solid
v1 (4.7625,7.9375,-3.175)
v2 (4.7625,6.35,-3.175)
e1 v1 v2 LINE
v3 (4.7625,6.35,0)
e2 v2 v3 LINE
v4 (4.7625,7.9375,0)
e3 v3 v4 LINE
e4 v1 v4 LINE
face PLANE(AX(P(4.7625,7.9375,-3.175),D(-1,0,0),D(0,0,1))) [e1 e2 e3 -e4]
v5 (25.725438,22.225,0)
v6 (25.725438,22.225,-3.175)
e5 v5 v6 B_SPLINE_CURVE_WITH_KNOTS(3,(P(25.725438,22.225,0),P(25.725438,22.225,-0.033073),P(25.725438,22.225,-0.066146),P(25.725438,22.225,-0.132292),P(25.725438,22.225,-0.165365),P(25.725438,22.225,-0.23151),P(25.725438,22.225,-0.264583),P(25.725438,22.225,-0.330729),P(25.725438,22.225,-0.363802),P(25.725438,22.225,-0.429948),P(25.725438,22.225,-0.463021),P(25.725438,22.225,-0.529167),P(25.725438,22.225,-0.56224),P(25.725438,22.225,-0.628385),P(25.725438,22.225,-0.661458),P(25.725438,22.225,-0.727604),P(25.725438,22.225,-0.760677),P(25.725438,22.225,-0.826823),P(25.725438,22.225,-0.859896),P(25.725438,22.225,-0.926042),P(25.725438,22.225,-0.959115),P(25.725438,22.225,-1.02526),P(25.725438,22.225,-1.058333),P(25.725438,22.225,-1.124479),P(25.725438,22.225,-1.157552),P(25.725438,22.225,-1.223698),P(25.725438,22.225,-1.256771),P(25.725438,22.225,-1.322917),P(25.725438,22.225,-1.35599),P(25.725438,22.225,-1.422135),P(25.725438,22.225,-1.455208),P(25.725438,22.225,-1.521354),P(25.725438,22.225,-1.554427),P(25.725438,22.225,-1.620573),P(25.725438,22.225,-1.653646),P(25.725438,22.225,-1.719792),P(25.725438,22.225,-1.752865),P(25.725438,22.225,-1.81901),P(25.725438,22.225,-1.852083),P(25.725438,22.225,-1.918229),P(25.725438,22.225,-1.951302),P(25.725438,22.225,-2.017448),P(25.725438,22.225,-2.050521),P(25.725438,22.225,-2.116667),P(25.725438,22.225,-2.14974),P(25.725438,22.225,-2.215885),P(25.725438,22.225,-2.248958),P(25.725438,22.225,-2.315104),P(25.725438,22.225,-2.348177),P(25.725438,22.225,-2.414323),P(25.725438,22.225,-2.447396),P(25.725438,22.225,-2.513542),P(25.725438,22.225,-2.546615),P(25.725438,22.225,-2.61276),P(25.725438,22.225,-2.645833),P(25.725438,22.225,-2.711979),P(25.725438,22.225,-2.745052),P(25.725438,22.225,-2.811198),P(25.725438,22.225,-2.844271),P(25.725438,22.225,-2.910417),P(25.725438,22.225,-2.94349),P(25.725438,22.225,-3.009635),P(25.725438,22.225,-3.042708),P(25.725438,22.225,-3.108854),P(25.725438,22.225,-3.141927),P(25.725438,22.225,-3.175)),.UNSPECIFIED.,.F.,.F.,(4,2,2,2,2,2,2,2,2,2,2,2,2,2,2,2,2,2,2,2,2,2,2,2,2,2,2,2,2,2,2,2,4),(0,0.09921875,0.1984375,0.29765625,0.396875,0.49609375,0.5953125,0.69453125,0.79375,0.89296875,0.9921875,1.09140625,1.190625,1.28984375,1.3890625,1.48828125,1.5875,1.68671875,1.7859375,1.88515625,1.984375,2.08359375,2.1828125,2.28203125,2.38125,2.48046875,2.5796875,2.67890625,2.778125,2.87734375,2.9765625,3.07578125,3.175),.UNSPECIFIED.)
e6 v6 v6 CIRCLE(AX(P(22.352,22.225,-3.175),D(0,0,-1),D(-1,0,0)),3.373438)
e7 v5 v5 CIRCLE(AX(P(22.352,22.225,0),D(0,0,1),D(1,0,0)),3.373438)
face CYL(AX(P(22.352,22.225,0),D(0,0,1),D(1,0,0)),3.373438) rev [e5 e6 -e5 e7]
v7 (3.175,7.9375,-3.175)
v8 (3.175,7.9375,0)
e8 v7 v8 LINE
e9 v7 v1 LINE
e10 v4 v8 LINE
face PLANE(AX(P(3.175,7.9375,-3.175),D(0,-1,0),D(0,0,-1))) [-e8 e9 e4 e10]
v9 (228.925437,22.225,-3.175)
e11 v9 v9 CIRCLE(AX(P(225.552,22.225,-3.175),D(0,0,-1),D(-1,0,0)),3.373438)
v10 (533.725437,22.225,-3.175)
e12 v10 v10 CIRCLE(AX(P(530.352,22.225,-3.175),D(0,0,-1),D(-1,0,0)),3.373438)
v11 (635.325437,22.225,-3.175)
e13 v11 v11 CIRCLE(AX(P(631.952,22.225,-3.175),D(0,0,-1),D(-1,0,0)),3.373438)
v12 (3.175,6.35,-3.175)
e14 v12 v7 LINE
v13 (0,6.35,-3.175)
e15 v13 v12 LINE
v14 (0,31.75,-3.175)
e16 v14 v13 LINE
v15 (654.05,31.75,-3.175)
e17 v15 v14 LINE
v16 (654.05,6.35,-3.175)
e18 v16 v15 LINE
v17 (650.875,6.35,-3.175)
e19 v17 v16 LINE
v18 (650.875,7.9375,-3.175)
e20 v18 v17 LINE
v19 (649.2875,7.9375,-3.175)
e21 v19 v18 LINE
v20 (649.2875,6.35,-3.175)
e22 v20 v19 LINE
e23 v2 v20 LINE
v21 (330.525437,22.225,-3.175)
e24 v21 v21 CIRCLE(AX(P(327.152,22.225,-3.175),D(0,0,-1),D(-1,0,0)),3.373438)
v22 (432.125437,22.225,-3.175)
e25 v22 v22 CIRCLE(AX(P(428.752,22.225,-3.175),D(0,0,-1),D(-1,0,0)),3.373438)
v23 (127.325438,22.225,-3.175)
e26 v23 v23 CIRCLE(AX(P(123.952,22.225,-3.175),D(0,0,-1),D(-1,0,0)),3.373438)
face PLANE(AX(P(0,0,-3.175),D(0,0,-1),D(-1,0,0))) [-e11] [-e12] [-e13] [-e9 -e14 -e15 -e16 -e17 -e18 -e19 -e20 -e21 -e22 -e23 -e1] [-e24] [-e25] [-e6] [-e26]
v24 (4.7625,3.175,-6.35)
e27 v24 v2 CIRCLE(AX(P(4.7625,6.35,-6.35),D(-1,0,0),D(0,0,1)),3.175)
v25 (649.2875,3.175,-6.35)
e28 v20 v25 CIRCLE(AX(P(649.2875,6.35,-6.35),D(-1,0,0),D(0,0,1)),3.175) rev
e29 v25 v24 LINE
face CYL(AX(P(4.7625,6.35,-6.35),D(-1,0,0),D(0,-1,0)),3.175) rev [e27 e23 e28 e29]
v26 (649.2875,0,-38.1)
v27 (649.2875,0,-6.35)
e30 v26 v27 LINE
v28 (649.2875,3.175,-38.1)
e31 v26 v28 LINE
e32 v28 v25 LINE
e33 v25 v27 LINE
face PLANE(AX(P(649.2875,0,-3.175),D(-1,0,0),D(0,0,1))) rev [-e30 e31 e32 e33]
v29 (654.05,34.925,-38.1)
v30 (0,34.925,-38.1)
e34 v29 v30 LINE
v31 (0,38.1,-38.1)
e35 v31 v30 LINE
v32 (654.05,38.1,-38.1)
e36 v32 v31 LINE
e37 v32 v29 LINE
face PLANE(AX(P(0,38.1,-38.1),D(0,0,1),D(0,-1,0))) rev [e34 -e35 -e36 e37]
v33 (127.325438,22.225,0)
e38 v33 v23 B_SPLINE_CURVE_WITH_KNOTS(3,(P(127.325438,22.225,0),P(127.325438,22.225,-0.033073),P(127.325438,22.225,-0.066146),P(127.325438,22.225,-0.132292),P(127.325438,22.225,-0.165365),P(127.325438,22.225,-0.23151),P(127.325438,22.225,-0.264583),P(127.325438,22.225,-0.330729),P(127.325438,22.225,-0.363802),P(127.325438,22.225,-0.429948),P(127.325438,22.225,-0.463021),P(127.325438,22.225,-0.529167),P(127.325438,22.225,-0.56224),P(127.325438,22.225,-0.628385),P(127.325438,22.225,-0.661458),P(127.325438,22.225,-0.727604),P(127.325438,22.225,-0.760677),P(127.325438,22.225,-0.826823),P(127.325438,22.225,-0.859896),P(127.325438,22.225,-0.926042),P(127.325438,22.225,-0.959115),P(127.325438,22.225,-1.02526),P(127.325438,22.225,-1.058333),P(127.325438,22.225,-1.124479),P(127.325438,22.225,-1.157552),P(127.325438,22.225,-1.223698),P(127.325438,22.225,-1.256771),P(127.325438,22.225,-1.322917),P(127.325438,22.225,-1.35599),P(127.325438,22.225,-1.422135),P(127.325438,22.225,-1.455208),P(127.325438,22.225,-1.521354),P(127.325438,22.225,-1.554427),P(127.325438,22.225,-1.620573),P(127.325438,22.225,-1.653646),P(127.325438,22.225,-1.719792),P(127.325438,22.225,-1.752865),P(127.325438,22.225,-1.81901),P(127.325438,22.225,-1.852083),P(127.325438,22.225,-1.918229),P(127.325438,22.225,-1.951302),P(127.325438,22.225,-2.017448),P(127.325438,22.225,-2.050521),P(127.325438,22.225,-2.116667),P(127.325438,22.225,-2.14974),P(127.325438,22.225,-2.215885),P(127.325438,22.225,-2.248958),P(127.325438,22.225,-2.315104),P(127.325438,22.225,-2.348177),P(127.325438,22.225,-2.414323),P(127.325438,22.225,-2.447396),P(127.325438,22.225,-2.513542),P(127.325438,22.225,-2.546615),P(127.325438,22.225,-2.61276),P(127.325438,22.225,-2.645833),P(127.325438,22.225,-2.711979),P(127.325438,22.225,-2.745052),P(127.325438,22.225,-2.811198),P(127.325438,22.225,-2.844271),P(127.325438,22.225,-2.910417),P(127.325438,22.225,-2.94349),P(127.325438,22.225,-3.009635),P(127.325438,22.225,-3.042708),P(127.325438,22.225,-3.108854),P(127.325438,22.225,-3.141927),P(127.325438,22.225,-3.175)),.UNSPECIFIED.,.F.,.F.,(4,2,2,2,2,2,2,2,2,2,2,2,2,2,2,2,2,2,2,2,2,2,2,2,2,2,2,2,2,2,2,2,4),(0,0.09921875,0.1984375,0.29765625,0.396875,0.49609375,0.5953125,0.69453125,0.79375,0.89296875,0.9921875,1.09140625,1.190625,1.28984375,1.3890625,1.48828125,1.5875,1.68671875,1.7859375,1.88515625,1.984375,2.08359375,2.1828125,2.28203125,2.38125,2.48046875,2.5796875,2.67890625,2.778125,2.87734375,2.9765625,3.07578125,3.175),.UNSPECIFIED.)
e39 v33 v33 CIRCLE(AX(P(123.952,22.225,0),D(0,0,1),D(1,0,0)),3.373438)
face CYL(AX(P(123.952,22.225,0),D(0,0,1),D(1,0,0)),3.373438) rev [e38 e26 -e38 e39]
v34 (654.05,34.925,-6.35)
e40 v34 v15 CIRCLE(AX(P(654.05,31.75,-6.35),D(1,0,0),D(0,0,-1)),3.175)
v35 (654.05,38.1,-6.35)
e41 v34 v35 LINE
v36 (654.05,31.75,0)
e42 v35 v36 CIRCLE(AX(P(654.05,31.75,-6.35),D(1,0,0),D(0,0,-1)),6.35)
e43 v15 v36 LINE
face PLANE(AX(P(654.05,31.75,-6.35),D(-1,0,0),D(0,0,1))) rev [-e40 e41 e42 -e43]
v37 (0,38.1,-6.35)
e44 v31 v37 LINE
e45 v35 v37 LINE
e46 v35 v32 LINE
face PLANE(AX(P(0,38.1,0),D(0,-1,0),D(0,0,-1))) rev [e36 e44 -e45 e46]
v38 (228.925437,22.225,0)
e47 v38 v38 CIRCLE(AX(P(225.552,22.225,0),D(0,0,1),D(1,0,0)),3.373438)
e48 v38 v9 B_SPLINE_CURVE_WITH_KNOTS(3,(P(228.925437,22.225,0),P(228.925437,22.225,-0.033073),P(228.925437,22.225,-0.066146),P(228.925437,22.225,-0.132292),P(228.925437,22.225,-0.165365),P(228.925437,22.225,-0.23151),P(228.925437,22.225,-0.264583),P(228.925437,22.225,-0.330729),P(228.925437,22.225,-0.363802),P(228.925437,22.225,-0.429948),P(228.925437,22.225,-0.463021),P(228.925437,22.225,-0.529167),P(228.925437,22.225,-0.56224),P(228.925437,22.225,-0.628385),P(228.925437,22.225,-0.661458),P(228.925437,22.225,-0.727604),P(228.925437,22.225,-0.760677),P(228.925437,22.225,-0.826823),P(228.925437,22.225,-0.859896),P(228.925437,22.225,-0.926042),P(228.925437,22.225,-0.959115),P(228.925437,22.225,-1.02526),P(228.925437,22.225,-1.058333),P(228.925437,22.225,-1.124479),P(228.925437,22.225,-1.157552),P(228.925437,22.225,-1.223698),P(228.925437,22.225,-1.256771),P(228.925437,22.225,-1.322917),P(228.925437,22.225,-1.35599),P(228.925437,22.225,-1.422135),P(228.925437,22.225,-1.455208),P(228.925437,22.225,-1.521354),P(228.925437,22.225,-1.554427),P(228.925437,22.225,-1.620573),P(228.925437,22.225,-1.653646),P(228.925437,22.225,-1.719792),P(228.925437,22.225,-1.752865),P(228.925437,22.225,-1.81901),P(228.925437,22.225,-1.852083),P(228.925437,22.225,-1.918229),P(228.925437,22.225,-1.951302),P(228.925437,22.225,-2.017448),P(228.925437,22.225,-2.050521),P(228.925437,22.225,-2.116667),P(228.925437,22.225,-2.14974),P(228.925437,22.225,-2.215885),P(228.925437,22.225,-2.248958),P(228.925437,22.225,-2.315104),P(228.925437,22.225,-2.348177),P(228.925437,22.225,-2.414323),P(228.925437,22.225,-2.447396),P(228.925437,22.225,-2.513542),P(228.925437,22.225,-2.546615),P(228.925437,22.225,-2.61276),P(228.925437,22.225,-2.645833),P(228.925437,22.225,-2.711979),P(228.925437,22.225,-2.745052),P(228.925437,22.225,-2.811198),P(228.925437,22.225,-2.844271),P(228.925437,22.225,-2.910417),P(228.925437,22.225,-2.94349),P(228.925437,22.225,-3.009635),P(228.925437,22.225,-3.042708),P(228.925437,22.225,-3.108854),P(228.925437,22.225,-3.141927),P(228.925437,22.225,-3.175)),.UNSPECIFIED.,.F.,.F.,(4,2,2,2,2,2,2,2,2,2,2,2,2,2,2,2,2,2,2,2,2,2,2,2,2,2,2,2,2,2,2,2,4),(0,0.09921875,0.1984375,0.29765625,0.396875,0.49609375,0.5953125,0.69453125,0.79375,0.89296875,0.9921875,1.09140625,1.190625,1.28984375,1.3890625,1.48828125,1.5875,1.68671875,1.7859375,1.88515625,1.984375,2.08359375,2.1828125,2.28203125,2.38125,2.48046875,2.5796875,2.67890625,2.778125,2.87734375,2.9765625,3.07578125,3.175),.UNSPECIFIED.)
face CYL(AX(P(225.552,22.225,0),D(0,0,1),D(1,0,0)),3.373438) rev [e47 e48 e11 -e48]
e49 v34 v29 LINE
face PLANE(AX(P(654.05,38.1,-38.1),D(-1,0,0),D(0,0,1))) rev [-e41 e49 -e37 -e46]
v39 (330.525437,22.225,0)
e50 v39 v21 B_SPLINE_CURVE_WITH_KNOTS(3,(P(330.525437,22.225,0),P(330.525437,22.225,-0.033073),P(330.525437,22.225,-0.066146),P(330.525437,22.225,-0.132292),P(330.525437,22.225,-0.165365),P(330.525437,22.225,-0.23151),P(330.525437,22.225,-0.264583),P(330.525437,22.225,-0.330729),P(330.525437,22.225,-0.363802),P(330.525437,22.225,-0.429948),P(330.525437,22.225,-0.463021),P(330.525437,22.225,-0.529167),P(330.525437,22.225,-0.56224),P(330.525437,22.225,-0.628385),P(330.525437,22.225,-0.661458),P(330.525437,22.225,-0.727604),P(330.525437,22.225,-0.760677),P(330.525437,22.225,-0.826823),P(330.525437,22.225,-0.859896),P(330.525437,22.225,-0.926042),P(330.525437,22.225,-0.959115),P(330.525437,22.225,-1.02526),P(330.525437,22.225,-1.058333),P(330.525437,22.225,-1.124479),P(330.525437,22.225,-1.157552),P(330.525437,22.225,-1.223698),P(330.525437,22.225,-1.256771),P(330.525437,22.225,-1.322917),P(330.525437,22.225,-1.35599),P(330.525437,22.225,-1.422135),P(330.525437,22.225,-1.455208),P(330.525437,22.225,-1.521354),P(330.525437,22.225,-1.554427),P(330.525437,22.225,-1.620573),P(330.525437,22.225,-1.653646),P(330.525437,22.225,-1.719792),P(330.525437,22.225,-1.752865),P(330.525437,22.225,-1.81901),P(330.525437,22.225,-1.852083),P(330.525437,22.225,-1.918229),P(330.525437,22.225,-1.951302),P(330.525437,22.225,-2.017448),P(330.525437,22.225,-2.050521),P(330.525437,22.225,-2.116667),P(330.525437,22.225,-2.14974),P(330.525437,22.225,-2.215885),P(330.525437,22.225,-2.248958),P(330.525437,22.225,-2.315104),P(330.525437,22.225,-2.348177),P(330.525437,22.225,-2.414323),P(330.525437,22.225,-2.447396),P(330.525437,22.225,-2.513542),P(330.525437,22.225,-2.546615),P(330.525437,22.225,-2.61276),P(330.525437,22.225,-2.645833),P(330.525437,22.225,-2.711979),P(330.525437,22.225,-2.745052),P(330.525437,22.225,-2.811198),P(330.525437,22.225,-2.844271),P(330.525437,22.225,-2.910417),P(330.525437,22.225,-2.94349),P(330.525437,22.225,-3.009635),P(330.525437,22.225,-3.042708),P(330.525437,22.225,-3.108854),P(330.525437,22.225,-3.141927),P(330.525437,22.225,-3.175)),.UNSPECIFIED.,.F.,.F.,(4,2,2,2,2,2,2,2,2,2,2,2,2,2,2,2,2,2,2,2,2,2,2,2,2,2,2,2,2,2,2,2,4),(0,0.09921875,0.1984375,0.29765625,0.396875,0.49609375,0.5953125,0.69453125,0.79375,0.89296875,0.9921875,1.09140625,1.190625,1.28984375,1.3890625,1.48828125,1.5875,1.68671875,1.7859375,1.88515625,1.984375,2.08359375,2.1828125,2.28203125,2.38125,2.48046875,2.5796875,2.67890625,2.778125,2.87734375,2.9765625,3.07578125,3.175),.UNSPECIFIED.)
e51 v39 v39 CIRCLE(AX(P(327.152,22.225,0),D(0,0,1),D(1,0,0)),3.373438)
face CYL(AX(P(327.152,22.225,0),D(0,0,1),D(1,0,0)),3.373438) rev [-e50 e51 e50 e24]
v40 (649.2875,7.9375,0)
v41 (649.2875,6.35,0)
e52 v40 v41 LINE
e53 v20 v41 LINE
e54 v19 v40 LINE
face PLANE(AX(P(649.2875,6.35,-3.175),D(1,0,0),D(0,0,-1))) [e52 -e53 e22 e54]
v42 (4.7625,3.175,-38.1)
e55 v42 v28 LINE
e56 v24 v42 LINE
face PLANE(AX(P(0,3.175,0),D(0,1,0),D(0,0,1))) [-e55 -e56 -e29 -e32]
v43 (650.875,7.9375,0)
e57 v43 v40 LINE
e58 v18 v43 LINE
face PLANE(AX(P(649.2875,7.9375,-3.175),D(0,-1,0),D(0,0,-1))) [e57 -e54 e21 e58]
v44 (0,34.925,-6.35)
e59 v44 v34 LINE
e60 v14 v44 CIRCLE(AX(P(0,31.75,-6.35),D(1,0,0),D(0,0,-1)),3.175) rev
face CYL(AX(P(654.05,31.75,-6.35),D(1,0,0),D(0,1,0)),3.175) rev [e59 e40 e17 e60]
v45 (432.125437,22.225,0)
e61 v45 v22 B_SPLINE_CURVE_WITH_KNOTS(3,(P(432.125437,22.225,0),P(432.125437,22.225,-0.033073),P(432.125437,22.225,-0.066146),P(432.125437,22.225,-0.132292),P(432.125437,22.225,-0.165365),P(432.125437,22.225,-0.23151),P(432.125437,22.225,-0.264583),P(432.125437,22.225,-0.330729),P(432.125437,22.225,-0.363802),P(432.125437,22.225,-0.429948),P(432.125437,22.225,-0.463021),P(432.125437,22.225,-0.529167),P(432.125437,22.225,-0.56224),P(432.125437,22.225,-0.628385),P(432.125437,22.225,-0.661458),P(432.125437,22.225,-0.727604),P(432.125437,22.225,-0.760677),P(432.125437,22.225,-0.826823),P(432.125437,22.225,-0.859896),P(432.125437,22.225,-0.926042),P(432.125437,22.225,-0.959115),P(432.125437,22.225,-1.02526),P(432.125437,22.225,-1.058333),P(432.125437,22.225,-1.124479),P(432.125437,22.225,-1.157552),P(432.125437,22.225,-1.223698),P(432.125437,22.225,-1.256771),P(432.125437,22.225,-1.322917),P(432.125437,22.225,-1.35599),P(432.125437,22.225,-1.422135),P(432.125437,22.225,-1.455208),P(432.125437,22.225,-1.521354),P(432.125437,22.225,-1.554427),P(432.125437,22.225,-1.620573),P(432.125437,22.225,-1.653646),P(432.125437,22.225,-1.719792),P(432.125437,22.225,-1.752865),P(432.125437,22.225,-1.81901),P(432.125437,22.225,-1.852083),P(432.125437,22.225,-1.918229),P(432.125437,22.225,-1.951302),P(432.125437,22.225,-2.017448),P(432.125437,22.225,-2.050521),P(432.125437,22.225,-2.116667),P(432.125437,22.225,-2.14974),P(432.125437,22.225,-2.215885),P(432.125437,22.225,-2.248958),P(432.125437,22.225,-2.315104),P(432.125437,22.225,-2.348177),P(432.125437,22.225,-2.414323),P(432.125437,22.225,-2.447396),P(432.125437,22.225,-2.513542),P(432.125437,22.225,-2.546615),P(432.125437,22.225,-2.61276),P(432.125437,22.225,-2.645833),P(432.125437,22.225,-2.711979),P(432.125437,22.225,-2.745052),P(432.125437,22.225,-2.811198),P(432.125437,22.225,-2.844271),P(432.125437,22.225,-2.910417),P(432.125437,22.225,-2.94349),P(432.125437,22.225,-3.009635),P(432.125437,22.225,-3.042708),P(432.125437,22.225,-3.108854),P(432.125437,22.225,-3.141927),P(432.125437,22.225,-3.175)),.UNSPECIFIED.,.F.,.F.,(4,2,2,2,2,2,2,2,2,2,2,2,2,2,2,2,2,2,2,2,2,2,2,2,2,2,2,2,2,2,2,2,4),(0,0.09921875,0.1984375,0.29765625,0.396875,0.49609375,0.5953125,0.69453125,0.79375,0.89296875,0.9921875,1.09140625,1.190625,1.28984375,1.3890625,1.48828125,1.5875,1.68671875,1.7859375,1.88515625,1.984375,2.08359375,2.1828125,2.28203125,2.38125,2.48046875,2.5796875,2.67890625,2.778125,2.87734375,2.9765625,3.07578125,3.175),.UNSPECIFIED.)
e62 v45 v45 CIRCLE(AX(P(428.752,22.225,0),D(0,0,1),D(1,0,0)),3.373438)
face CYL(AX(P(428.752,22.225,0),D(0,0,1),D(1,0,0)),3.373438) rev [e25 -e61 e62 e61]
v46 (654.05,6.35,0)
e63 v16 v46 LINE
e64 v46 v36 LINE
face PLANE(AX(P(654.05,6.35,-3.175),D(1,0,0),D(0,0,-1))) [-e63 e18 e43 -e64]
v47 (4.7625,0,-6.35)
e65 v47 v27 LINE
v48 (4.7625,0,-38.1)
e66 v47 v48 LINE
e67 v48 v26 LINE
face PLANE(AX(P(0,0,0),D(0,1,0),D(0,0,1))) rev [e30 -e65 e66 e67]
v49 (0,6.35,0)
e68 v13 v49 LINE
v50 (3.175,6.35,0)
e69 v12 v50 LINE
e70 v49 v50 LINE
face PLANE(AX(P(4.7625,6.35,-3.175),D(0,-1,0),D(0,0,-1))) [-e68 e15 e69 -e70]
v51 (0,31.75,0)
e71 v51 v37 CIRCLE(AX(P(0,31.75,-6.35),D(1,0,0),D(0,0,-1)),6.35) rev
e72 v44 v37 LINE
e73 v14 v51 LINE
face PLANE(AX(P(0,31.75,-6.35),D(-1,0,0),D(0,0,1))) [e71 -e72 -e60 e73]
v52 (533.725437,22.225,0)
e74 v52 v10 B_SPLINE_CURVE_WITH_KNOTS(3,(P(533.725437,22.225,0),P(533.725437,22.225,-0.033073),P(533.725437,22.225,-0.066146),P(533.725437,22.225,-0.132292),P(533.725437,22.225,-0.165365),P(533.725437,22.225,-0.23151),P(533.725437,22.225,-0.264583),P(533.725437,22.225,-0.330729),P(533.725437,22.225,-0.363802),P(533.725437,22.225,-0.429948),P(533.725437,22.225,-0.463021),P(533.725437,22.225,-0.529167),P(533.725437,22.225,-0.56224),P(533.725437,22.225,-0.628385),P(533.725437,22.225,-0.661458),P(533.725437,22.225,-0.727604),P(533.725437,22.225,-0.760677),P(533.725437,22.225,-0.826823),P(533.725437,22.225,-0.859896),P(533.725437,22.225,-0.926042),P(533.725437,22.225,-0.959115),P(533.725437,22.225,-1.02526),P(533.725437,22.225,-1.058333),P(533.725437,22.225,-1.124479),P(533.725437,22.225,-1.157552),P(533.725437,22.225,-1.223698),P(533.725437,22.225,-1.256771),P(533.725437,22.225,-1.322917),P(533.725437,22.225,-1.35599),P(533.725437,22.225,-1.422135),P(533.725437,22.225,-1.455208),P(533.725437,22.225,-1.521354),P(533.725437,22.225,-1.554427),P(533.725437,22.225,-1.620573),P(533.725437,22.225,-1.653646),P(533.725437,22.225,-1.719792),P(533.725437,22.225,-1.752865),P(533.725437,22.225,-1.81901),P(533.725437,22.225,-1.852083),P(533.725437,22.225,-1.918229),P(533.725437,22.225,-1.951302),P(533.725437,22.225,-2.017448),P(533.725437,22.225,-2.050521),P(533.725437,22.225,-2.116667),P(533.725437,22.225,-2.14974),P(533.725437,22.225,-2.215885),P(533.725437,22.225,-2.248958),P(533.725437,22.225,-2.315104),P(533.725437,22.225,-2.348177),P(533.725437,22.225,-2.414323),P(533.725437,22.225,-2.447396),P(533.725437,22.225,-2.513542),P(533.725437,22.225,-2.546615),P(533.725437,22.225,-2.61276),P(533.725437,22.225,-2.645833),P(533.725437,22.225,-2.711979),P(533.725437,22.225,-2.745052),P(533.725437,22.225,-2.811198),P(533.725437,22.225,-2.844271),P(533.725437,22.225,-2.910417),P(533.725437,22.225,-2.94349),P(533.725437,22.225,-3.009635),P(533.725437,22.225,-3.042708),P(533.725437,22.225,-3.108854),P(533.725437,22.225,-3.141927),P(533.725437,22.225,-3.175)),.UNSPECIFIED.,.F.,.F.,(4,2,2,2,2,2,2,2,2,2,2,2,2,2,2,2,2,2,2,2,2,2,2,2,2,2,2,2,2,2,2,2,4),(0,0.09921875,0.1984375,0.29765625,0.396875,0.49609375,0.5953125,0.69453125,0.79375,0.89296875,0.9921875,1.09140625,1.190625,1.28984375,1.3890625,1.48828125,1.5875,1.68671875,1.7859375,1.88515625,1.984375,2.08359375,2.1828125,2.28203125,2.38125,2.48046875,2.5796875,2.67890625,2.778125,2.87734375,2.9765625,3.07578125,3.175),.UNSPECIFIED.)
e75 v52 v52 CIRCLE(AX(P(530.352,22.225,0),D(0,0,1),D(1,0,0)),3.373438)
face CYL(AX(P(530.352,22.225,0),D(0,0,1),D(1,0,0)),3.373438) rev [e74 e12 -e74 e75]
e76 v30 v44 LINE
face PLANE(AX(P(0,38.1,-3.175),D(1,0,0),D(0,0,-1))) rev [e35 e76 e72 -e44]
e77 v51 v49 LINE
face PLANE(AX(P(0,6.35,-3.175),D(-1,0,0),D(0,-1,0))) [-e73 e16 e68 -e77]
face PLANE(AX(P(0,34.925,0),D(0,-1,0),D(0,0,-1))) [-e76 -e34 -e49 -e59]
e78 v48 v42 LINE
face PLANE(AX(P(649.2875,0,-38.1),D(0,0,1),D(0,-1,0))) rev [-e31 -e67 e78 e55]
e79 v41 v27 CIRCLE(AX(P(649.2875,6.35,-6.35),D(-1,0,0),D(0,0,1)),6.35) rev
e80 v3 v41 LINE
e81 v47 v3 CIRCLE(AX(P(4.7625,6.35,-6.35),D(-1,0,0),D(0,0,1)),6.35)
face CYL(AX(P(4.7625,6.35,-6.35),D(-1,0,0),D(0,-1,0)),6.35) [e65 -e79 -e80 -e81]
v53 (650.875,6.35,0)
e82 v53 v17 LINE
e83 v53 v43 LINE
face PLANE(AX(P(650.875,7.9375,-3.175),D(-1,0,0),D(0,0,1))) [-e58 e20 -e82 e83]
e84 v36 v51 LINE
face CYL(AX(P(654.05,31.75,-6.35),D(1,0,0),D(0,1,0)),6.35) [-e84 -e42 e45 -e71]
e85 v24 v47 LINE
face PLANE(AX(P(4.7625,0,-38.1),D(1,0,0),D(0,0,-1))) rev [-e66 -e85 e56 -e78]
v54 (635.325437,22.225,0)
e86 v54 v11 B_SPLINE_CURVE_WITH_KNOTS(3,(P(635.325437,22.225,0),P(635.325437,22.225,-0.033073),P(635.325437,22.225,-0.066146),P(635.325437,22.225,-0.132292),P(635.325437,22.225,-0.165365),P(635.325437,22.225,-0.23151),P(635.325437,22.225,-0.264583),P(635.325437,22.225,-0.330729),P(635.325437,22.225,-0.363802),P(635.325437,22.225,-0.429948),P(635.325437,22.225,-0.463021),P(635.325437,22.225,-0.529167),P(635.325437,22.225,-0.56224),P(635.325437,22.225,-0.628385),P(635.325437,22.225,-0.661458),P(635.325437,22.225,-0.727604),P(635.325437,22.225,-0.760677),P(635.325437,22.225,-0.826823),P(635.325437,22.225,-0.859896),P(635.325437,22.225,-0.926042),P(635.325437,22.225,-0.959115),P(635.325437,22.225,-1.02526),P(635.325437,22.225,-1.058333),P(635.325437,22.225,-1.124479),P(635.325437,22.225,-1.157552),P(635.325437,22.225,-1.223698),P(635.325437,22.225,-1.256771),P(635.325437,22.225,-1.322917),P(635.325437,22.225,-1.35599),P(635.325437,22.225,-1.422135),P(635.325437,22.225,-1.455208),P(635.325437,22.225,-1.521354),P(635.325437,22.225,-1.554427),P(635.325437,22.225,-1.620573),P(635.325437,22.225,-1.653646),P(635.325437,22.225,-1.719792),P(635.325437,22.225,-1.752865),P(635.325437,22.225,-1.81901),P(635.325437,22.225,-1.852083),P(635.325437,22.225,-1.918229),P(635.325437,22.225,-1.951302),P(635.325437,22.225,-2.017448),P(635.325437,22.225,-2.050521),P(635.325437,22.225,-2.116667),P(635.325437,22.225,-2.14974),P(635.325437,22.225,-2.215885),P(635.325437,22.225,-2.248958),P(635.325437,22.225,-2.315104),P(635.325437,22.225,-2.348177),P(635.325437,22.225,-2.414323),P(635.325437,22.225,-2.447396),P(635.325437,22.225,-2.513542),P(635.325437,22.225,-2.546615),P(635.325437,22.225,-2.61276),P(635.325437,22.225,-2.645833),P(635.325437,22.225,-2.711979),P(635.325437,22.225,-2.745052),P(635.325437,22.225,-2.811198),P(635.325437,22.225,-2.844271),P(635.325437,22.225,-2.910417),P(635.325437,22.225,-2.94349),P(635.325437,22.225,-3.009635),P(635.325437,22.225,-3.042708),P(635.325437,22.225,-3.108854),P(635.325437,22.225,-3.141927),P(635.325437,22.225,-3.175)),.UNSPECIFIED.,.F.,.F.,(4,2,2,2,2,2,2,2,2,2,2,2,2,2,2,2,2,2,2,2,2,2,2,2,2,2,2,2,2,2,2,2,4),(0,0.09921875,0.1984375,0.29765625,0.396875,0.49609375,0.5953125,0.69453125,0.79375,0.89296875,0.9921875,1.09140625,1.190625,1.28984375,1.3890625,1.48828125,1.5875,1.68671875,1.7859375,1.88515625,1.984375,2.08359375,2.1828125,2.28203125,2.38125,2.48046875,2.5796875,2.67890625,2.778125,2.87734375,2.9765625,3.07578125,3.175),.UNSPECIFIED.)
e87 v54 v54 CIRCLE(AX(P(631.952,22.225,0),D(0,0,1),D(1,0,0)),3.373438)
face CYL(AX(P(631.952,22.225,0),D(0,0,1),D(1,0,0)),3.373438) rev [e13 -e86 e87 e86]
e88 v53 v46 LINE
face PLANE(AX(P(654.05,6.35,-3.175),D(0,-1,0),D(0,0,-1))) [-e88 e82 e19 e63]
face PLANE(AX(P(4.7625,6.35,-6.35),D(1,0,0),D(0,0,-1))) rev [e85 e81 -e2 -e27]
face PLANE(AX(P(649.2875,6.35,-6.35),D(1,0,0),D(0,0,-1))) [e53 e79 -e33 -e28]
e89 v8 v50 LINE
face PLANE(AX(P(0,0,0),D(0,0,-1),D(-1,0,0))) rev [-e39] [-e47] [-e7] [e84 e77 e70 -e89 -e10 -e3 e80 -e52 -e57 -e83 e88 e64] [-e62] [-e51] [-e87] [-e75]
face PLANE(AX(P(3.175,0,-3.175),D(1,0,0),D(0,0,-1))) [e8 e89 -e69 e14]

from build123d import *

# Parameters (mm, degrees)
BASE_FLANGE1_DEPTH               = 3.175
EDGE_FLANGE1_STRIP_W             = 19.05
EDGE_FLANGE1_STRIP_H             = 3.175
EDGE_FLANGE1_STRIP_CUT_DEPTH     = 654.05
EDGE_FLANGE1_DEPTH               = 654.05
EDGE_FLANGE2_START               = 4.7625
EDGE_FLANGE2_DEPTH               = 644.525
EDGE_FLANGE2_START_2             = 3.175
EDGE_FLANGE2_2_OUTLINE_W         = 1.5875
EDGE_FLANGE2_2_OUTLINE_H         = 3.175
EDGE_FLANGE2_2_DEPTH             = 1.5875
EDGE_FLANGE2_START_3             = 649.2875
EDGE_FLANGE2_3_OUTLINE_W         = 1.5875
EDGE_FLANGE2_3_OUTLINE_H         = 3.175
EDGE_FLANGE2_3_DEPTH             = 1.5875
EDGE_FLANGE2_4_DEPTH             = 644.525
F_17_64_0_26563_DIAMETER_HOLE1_D = 6.746875
LPATTERN1_COUNT                  = 7
LPATTERN1_PITCH                  = 101.6


# Read off the part's stored shape, not the designer's step: Edge-Flange2
# Sheet-metal steps are written as plain solids
with BuildPart() as part:
    # Sketch2 → Base-Flange1 (new body)
    with BuildSketch(Plane.XY):
        Polygon((4.7625, 0), (4.7625, 6.35), (0, 6.35), (0, 38.1), (654.05, 38.1), (654.05, 6.35), (649.2875, 6.35), (649.2875, 0), align=None)
    extrude(amount=-BASE_FLANGE1_DEPTH)

    # Edge-Flange1 strip (across the edge) → Edge-Flange1 strip cut (cut)
    with BuildSketch(Plane(origin=(0, 38.1, -3.175), x_dir=(0, -1, 0), z_dir=(1, 0, 0))):
        with Locations((-3.175, -1.5875)):
            Rectangle(EDGE_FLANGE1_STRIP_W, EDGE_FLANGE1_STRIP_H)
    extrude(amount=EDGE_FLANGE1_STRIP_CUT_DEPTH, mode=Mode.SUBTRACT)

    # Edge-Flange1 section (across the edge) → Edge-Flange1 (add)
    with BuildSketch(Plane(origin=(0, 38.1, -3.175), x_dir=(0, -1, 0), z_dir=(1, 0, 0))):
        with BuildLine():
            Line((0, 3.175), (0, 34.925))
            Line((0, 34.925), (3.175, 34.925))
            Line((3.175, 34.925), (3.175, 3.175))
            ThreePointArc((3.175, 3.175), (4.10493597, 0.92993597), (6.35, 0))
            Line((6.35, 0), (6.35, -3.175))
            ThreePointArc((6.35, -3.175), (1.859871939, -1.315128061), (0, 3.175))
        make_face()
    extrude(amount=EDGE_FLANGE1_DEPTH)

    # Edge-Flange2 outline → Edge-Flange2 (cut)
    with BuildSketch(Plane.YZ.offset(EDGE_FLANGE2_START)):
        with BuildLine():
            Line((0, -3.175), (0.850738685, -3.175))
            ThreePointArc((0.850738685, -3.175), (3.174999999, -0.850738686), (6.35, 0))
            Line((6.35, 0), (0, 0))
            Line((0, 0), (0, -3.175))
        make_face()
    extrude(amount=EDGE_FLANGE2_DEPTH, mode=Mode.SUBTRACT)

    # Edge-Flange2 2 outline → Edge-Flange2 2 (cut)
    with BuildSketch(Plane.YZ.offset(EDGE_FLANGE2_START_2)):
        with Locations((7.14375, -1.5875)):
            Rectangle(EDGE_FLANGE2_2_OUTLINE_W, EDGE_FLANGE2_2_OUTLINE_H)
    extrude(amount=EDGE_FLANGE2_2_DEPTH, mode=Mode.SUBTRACT)

    # Edge-Flange2 3 outline → Edge-Flange2 3 (cut)
    with BuildSketch(Plane.YZ.offset(EDGE_FLANGE2_START_3)):
        with Locations((7.14375, -1.5875)):
            Rectangle(EDGE_FLANGE2_3_OUTLINE_W, EDGE_FLANGE2_3_OUTLINE_H)
    extrude(amount=EDGE_FLANGE2_3_DEPTH, mode=Mode.SUBTRACT)

    # Edge-Flange2 4 outline → Edge-Flange2 4 (add)
    with BuildSketch(Plane.YZ.offset(EDGE_FLANGE2_START)):
        with BuildLine():
            Line((0, -38.1), (3.175, -38.1))
            Line((3.175, -38.1), (3.175, -6.35))
            ThreePointArc((3.175, -6.35), (4.10493597, -4.10493597), (6.35, -3.175))
            Line((6.35, -3.175), (0.850738685, -3.175))
            ThreePointArc((0.850738685, -3.175), (0.216371003, -4.706499064), (0, -6.35))
            Line((0, -6.35), (0, -38.1))
        make_face()
    extrude(amount=EDGE_FLANGE2_4_DEPTH)

    # 17/64 (0.26563) Diameter Hole1 (through all)
    with Locations(Plane.XY):
        with Locations((22.352, 22.225)):
            f_17_64_0_26563_diameter_hole1 = Hole(F_17_64_0_26563_DIAMETER_HOLE1_D / 2)

    # LPattern1: 17/64 (0.26563) Diameter Hole1 ×7
    with Locations(*[(i * LPATTERN1_PITCH, 0, 0) for i in range(1, LPATTERN1_COUNT)]):
        add(f_17_64_0_26563_diameter_hole1, mode=Mode.SUBTRACT)


solid = part.part
